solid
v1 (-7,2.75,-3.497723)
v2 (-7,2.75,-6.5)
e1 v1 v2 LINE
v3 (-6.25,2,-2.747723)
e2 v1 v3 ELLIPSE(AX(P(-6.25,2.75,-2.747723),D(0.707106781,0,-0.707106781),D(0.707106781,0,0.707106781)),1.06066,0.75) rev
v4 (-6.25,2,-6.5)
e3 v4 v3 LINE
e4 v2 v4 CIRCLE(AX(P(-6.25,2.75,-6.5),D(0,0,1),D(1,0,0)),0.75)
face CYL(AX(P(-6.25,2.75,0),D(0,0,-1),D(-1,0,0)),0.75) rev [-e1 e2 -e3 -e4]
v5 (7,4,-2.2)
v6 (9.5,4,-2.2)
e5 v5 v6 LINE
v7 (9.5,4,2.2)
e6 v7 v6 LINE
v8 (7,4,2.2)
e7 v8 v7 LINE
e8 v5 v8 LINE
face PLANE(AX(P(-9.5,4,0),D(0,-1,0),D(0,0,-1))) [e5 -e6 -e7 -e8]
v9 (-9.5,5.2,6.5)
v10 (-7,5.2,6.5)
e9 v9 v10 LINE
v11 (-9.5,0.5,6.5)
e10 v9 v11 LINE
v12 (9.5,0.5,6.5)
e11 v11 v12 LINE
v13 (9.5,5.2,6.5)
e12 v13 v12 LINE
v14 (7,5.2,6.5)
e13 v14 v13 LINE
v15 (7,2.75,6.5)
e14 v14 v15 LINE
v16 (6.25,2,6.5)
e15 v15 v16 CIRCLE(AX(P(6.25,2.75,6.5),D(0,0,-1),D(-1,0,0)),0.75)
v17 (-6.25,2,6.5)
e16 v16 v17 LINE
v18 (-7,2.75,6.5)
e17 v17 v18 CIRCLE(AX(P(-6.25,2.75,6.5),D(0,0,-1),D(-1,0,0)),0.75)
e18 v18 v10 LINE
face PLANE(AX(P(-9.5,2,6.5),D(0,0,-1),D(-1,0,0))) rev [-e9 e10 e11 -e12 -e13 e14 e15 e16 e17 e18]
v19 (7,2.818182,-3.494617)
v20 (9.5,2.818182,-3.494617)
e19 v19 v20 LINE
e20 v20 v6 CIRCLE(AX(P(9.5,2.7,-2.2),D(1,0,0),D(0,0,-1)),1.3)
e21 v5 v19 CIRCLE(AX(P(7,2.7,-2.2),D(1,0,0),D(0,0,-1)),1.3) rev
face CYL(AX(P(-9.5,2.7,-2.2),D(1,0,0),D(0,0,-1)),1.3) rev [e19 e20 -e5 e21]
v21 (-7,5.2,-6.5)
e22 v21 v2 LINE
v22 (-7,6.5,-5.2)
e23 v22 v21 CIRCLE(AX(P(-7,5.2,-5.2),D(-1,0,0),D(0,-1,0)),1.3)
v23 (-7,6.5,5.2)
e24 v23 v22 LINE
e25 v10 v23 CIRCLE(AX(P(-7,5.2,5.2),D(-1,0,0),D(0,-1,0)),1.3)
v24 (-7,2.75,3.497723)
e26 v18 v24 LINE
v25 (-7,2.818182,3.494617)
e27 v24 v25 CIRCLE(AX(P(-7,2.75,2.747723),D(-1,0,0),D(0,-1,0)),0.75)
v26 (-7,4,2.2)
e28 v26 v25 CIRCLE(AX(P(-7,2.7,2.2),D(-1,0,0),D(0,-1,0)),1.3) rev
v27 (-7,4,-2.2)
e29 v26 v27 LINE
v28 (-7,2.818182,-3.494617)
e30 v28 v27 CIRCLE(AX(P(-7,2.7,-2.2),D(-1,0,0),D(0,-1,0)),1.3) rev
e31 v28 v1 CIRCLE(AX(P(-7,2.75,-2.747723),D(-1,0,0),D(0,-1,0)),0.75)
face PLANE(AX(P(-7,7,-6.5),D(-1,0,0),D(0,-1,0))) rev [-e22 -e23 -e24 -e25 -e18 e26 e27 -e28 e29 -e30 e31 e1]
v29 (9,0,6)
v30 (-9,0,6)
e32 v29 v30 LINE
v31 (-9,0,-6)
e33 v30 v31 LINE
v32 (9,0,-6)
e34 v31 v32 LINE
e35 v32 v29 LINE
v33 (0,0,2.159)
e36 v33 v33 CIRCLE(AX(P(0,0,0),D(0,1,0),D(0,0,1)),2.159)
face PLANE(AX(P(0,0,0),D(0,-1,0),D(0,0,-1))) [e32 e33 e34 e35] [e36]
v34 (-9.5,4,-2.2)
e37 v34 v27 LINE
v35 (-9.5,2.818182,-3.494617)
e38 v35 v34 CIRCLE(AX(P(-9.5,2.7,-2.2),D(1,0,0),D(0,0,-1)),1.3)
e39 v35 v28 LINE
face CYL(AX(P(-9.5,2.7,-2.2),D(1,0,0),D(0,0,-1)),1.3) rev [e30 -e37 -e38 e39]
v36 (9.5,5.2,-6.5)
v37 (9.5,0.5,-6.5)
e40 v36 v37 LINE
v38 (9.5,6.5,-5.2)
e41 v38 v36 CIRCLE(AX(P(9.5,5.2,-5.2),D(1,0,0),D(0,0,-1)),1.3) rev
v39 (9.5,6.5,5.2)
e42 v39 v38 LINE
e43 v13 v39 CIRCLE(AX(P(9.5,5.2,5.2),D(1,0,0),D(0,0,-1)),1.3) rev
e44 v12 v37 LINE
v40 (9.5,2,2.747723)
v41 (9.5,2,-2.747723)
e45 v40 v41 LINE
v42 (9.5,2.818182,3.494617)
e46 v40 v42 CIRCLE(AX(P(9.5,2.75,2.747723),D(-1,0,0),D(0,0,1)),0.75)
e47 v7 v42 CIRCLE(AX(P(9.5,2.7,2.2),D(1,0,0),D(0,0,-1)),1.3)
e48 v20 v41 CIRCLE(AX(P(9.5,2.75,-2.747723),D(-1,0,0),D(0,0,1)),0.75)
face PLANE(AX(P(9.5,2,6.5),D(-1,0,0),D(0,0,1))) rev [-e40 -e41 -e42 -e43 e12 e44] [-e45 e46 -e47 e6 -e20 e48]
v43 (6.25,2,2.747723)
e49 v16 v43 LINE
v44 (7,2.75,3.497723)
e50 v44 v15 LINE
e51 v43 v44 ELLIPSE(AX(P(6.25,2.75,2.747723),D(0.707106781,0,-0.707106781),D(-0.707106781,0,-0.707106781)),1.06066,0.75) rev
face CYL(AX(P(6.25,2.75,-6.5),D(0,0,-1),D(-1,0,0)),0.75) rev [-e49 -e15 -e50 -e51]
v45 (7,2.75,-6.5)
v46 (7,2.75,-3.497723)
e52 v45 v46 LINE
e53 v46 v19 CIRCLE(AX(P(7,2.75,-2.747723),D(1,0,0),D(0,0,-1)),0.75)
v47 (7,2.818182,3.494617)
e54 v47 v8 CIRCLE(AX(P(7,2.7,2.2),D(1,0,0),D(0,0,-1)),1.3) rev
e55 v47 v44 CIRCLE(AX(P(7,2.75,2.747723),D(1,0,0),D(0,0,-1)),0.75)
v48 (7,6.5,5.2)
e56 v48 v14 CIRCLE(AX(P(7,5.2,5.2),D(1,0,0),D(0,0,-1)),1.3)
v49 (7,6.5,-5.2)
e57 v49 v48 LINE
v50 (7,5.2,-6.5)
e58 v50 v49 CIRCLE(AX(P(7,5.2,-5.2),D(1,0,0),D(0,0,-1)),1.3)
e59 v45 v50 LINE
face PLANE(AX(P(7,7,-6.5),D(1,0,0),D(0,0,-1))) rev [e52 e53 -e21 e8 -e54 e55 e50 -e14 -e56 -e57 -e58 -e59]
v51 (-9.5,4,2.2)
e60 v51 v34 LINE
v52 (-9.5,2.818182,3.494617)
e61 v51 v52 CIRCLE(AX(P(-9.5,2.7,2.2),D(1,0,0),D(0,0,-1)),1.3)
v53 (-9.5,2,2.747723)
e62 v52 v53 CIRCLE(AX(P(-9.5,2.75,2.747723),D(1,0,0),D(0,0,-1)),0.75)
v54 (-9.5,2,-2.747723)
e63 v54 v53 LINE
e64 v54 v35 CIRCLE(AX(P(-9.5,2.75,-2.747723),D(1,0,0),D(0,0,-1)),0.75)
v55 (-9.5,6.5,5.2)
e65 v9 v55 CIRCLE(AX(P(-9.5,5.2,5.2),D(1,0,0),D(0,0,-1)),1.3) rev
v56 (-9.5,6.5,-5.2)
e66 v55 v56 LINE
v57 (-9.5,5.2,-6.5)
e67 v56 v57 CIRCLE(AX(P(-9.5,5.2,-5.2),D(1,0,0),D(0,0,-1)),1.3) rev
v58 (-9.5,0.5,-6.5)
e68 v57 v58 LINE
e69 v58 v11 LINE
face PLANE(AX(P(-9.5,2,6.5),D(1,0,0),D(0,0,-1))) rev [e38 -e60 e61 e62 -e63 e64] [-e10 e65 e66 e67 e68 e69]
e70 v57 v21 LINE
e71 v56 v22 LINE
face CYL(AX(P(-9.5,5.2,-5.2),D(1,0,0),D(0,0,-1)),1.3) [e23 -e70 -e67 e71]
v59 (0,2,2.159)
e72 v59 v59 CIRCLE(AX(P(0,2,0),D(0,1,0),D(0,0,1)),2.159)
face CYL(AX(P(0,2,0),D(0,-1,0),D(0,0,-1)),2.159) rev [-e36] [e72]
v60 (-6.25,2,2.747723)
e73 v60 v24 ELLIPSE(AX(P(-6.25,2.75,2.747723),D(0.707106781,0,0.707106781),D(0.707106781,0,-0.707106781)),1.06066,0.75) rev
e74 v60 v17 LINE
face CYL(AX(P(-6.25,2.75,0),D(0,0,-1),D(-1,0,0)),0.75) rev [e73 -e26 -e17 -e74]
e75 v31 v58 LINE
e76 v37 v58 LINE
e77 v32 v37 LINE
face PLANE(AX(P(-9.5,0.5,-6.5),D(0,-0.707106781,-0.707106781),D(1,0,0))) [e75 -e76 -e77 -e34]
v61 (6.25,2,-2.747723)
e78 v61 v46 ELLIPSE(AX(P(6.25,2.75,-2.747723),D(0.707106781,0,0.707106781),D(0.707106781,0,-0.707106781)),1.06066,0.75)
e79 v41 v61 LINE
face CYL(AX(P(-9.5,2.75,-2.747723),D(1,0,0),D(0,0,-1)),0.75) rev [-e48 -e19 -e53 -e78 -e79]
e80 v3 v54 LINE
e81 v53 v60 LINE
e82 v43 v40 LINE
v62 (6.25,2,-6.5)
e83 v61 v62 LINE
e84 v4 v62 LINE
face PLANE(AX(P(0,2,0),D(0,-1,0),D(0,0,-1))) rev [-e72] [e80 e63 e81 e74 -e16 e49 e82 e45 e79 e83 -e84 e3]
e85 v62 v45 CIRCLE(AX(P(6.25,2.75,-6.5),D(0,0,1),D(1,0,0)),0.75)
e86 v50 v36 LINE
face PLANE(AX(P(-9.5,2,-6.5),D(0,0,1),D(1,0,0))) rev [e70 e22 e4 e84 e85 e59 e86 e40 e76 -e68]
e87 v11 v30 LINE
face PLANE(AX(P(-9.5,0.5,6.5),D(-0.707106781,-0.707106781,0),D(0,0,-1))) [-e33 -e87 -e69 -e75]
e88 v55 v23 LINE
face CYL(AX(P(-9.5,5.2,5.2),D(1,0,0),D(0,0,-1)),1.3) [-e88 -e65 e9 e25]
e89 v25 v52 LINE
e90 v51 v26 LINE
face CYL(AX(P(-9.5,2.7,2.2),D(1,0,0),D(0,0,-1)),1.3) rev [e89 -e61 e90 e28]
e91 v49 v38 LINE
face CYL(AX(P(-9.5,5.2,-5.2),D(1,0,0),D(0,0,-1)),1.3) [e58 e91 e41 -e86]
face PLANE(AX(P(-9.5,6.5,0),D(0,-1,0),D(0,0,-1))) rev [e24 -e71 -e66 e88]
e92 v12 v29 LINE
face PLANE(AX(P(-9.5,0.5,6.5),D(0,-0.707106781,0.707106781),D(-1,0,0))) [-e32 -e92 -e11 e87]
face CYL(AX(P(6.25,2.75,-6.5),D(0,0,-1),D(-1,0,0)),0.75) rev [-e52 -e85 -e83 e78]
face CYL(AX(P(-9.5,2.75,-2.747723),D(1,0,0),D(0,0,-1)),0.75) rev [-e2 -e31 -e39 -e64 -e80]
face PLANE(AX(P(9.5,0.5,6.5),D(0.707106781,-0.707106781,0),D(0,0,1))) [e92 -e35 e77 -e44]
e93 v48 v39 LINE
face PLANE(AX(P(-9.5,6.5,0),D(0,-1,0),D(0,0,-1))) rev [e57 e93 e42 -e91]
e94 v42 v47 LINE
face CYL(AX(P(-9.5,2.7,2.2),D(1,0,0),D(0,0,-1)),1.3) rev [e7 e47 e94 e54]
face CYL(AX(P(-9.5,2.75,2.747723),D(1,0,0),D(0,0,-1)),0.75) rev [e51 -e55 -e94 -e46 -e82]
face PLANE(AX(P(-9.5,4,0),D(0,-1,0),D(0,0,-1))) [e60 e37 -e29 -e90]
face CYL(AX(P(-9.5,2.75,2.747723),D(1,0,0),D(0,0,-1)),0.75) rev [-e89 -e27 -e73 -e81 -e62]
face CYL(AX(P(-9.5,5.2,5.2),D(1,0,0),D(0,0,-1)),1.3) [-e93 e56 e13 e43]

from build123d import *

# Parameters (mm, degrees)
SKETCH1_W               = 19
SKETCH1_H               = 13
SKETCH1_R               = 2.159
BOSS_EXTRUDE1_DEPTH     = 2
BOSS_EXTRUDE2_DEPTH     = 19
CUT_EXTRUDE1_DEPTH      = 18.363755354
CUT_EXTRUDE1_DEPTH_BACK = 18.363755354
SKETCH4_W               = 14
SKETCH4_H               = 5
FILLET1_R               = 0.75
CHAMFER1_SIZE           = 0.5


with BuildPart() as part:
    # Sketch1 → Boss-Extrude1 (new body)
    with BuildSketch(Plane(origin=(0, 0, 0), x_dir=(1, 0, 0), z_dir=(0, 1, 0))):
        Rectangle(SKETCH1_W, SKETCH1_H)
        with Locations(Location((0, 0, 0), (0, 0, 270))):
            Circle(SKETCH1_R, mode=Mode.SUBTRACT)
    extrude(amount=BOSS_EXTRUDE1_DEPTH)

    # Sketch2 → Boss-Extrude2 (add)
    with BuildSketch(Plane(origin=(9.5, 0, 0), x_dir=(0, 0, -1), z_dir=(1, 0, 0))):
        with BuildLine():
            Line((-6.5, 5.2), (-6.5, 2))
            Line((-6.5, 2), (-3.5, 2))
            Line((-3.5, 2), (-3.5, 2.7))
            ThreePointArc((-3.5, 2.7), (-3.119238816, 3.619238816), (-2.2, 4))
            Line((-2.2, 4), (2.2, 4))
            ThreePointArc((2.2, 4), (3.119238816, 3.619238816), (3.5, 2.7))
            Line((3.5, 2.7), (3.5, 2))
            Line((3.5, 2), (6.5, 2))
            Line((6.5, 2), (6.5, 5.2))
            ThreePointArc((6.5, 5.2), (6.119238816, 6.119238816), (5.2, 6.5))
            Line((5.2, 6.5), (-5.2, 6.5))
            ThreePointArc((-5.2, 6.5), (-6.119238816, 6.119238816), (-6.5, 5.2))
        make_face()
    extrude(amount=-BOSS_EXTRUDE2_DEPTH)

    # Sketch4 → Cut-Extrude1 (cut, two sides: drawn at the far end of the back side and taken through both)
    with BuildSketch(Plane.XY.offset(6.5).offset(-CUT_EXTRUDE1_DEPTH_BACK)):
        with Locations((0, 4.5)):
            Rectangle(SKETCH4_W, SKETCH4_H)
    extrude(amount=CUT_EXTRUDE1_DEPTH + CUT_EXTRUDE1_DEPTH_BACK, mode=Mode.SUBTRACT)

    # Fillet1
    # the kernel refuses this fillet: 0.75 mm, written as the material it adds along each edge
    with BuildSketch(Plane(origin=(-7, 2, 3.5), x_dir=(1, 0, 0), z_dir=(0, 0, 1)), Plane(origin=(-7, 2, -6.5), x_dir=(1, 0, 0), z_dir=(0, 0, 1))) as fillet1_piece_1:
        with BuildLine():
            CenterArc((FILLET1_R, FILLET1_R), FILLET1_R, 180, 90)
            Line((0, FILLET1_R), (-FILLET1_R * 0.02, FILLET1_R))
            Line((-FILLET1_R * 0.02, FILLET1_R), (-FILLET1_R * 0.02, -FILLET1_R * 0.02))
            Line((-FILLET1_R * 0.02, -FILLET1_R * 0.02), (FILLET1_R, -FILLET1_R * 0.02))
            Line((FILLET1_R, -FILLET1_R * 0.02), (FILLET1_R, 0))
        make_face()
    extrude(amount=3)
    with BuildSketch(Plane(origin=(-7, 2, 3.5), x_dir=(0, 0, -1), z_dir=(-1, 0, 0)), Plane(origin=(9.5, 2, 3.5), x_dir=(0, 0, -1), z_dir=(-1, 0, 0))) as fillet1_piece_2:
        with BuildLine():
            CenterArc((0.752277442, -0.75), FILLET1_R, 90, 95.21590857)
            Line((0.005383046, -0.818181818), (-0.069306394, -0.825))
            ThreePointArc((-0.069306394, -0.825), (-0.075, -0.7), (-0.075, 0))
            Line((-0.075, 0), (0, 0.075))
            Line((0, 0.075), (0.752277442, 0.075))
            Line((0.752277442, 0.075), (0.752277442, 0))
        make_face()
    extrude(amount=2.5)
    with BuildSketch(Plane(origin=(7, 2, 6.5), x_dir=(0, 1, 0), z_dir=(0, 0, -1)), Plane(origin=(7, 2, -3.5), x_dir=(0, 1, 0), z_dir=(0, 0, -1))) as fillet1_piece_3:
        with BuildLine():
            CenterArc((FILLET1_R, -FILLET1_R), FILLET1_R, 90, 90)
            Line((0, -FILLET1_R), (-FILLET1_R * 0.02, -FILLET1_R))
            Line((-FILLET1_R * 0.02, -FILLET1_R), (-FILLET1_R * 0.02, FILLET1_R * 0.02))
            Line((-FILLET1_R * 0.02, FILLET1_R * 0.02), (FILLET1_R, FILLET1_R * 0.02))
            Line((FILLET1_R, FILLET1_R * 0.02), (FILLET1_R, 0))
        make_face()
    extrude(amount=3)
    with BuildSketch(Plane(origin=(9.5, 2, -3.5), x_dir=(0, 0, 1), z_dir=(-1, 0, 0)), Plane(origin=(-7, 2, -3.5), x_dir=(0, 0, 1), z_dir=(-1, 0, 0))) as fillet1_piece_4:
        with BuildLine():
            CenterArc((0.752277442, 0.75), FILLET1_R, 174.78409143, 95.21590857)
            Line((0.005383046, 0.818181818), (-0.069306394, 0.825))
            ThreePointArc((-0.069306394, 0.825), (-0.075, 0.7), (-0.075, 0))
            Line((-0.075, 0), (0, -0.075))
            Line((0, -0.075), (0.752277442, -0.075))
            Line((0.752277442, -0.075), (0.752277442, 0))
        make_face()
    extrude(amount=2.5)
    with BuildSketch(Plane(origin=(-7, 2, 1.625), x_dir=(1, 0, 0), z_dir=(0, 0, 1))) as fillet1_piece_5a_section:
        with BuildLine():
            CenterArc((FILLET1_R, FILLET1_R), FILLET1_R, 180, 90)
            Line((0, FILLET1_R), (-FILLET1_R * 0.02, FILLET1_R))
            Line((-FILLET1_R * 0.02, FILLET1_R), (-FILLET1_R * 0.02, -FILLET1_R * 0.02))
            Line((-FILLET1_R * 0.02, -FILLET1_R * 0.02), (FILLET1_R, -FILLET1_R * 0.02))
            Line((FILLET1_R, -FILLET1_R * 0.02), (FILLET1_R, 0))
        make_face()
    fillet1_piece_5a = extrude(amount=4.875, mode=Mode.PRIVATE)
    fillet1_piece_5a = split(fillet1_piece_5a, bisect_by=Plane(origin=(-6.830203664, 2.169796336, 3.5), z_dir=(0, 0, -1)), keep=Keep.TOP, mode=Mode.PRIVATE)
    with BuildSketch(Plane(origin=(-4.954501184, 2, 3.5), x_dir=(0, 0, -1), z_dir=(-1, 0, 0))) as fillet1_piece_5b_section:
        with BuildLine():
            CenterArc((0.752277442, -0.75), FILLET1_R, 90, 95.21590857)
            Line((0.005383046, -0.818181818), (-0.069306394, -0.825))
            ThreePointArc((-0.069306394, -0.825), (-0.075, -0.7), (-0.075, 0))
            Line((-0.075, 0), (0, 0.075))
            Line((0, 0.075), (0.752277442, 0.075))
            Line((0.752277442, 0.075), (0.752277442, 0))
        make_face()
    fillet1_piece_5b = extrude(amount=4.545498816, mode=Mode.PRIVATE)
    fillet1_piece_5b = split(fillet1_piece_5b, bisect_by=Plane(origin=(-7, 2.182819777, 3.341220423), z_dir=(1, 0, 0)), keep=Keep.TOP, mode=Mode.PRIVATE)
    fillet1_piece_5 = fillet1_piece_5a & fillet1_piece_5b
    add(fillet1_piece_5)
    with BuildSketch(Plane(origin=(7, 2, 6.5), x_dir=(0, 1, 0), z_dir=(0, 0, -1))) as fillet1_piece_6a_section:
        with BuildLine():
            CenterArc((FILLET1_R, -FILLET1_R), FILLET1_R, 90, 90)
            Line((0, -FILLET1_R), (-FILLET1_R * 0.02, -FILLET1_R))
            Line((-FILLET1_R * 0.02, -FILLET1_R), (-FILLET1_R * 0.02, FILLET1_R * 0.02))
            Line((-FILLET1_R * 0.02, FILLET1_R * 0.02), (FILLET1_R, FILLET1_R * 0.02))
            Line((FILLET1_R, FILLET1_R * 0.02), (FILLET1_R, 0))
        make_face()
    fillet1_piece_6a = extrude(amount=4.875, mode=Mode.PRIVATE)
    fillet1_piece_6a = split(fillet1_piece_6a, bisect_by=Plane(origin=(6.830203664, 2.169796336, 3.5), z_dir=(0, 0, -1)), keep=Keep.TOP, mode=Mode.PRIVATE)
    with BuildSketch(Plane(origin=(9.5, 2, 3.5), x_dir=(0, 0, -1), z_dir=(-1, 0, 0))) as fillet1_piece_6b_section:
        with BuildLine():
            CenterArc((0.752277442, -0.75), FILLET1_R, 90, 95.21590857)
            Line((0.005383046, -0.818181818), (-0.069306394, -0.825))
            ThreePointArc((-0.069306394, -0.825), (-0.075, -0.7), (-0.075, 0))
            Line((-0.075, 0), (0, 0.075))
            Line((0, 0.075), (0.752277442, 0.075))
            Line((0.752277442, 0.075), (0.752277442, 0))
        make_face()
    fillet1_piece_6b = extrude(amount=4.545498816, mode=Mode.PRIVATE)
    fillet1_piece_6b = split(fillet1_piece_6b, bisect_by=Plane(origin=(7, 2.182819777, 3.341220423), z_dir=(-1, 0, 0)), keep=Keep.TOP, mode=Mode.PRIVATE)
    fillet1_piece_6 = fillet1_piece_6a & fillet1_piece_6b
    add(fillet1_piece_6)
    with BuildSketch(Plane(origin=(7, 2, -1.625), x_dir=(0, 1, 0), z_dir=(0, 0, -1))) as fillet1_piece_7a_section:
        with BuildLine():
            CenterArc((FILLET1_R, -FILLET1_R), FILLET1_R, 90, 90)
            Line((0, -FILLET1_R), (-FILLET1_R * 0.02, -FILLET1_R))
            Line((-FILLET1_R * 0.02, -FILLET1_R), (-FILLET1_R * 0.02, FILLET1_R * 0.02))
            Line((-FILLET1_R * 0.02, FILLET1_R * 0.02), (FILLET1_R, FILLET1_R * 0.02))
            Line((FILLET1_R, FILLET1_R * 0.02), (FILLET1_R, 0))
        make_face()
    fillet1_piece_7a = extrude(amount=4.875, mode=Mode.PRIVATE)
    fillet1_piece_7a = split(fillet1_piece_7a, bisect_by=Plane(origin=(6.830203664, 2.169796336, -3.5), z_dir=(0, 0, 1)), keep=Keep.TOP, mode=Mode.PRIVATE)
    with BuildSketch(Plane(origin=(9.5, 2, -3.5), x_dir=(0, 0, 1), z_dir=(-1, 0, 0))) as fillet1_piece_7b_section:
        with BuildLine():
            CenterArc((0.752277442, 0.75), FILLET1_R, 174.78409143, 95.21590857)
            Line((0.005383046, 0.818181818), (-0.069306394, 0.825))
            ThreePointArc((-0.069306394, 0.825), (-0.075, 0.7), (-0.075, 0))
            Line((-0.075, 0), (0, -0.075))
            Line((0, -0.075), (0.752277442, -0.075))
            Line((0.752277442, -0.075), (0.752277442, 0))
        make_face()
    fillet1_piece_7b = extrude(amount=4.545498816, mode=Mode.PRIVATE)
    fillet1_piece_7b = split(fillet1_piece_7b, bisect_by=Plane(origin=(7, 2.182819777, -3.341220423), z_dir=(-1, 0, 0)), keep=Keep.TOP, mode=Mode.PRIVATE)
    fillet1_piece_7 = fillet1_piece_7a & fillet1_piece_7b
    add(fillet1_piece_7)
    with BuildSketch(Plane(origin=(-4.954501184, 2, -3.5), x_dir=(0, 0, 1), z_dir=(-1, 0, 0))) as fillet1_piece_8a_section:
        with BuildLine():
            CenterArc((0.752277442, 0.75), FILLET1_R, 174.78409143, 95.21590857)
            Line((0.005383046, 0.818181818), (-0.069306394, 0.825))
            ThreePointArc((-0.069306394, 0.825), (-0.075, 0.7), (-0.075, 0))
            Line((-0.075, 0), (0, -0.075))
            Line((0, -0.075), (0.752277442, -0.075))
            Line((0.752277442, -0.075), (0.752277442, 0))
        make_face()
    fillet1_piece_8a = extrude(amount=4.545498816, mode=Mode.PRIVATE)
    fillet1_piece_8a = split(fillet1_piece_8a, bisect_by=Plane(origin=(-7, 2.182819777, -3.341220423), z_dir=(1, 0, 0)), keep=Keep.TOP, mode=Mode.PRIVATE)
    with BuildSketch(Plane(origin=(-7, 2, -6.5), x_dir=(1, 0, 0), z_dir=(0, 0, 1))) as fillet1_piece_8b_section:
        with BuildLine():
            CenterArc((FILLET1_R, FILLET1_R), FILLET1_R, 180, 90)
            Line((0, FILLET1_R), (-FILLET1_R * 0.02, FILLET1_R))
            Line((-FILLET1_R * 0.02, FILLET1_R), (-FILLET1_R * 0.02, -FILLET1_R * 0.02))
            Line((-FILLET1_R * 0.02, -FILLET1_R * 0.02), (FILLET1_R, -FILLET1_R * 0.02))
            Line((FILLET1_R, -FILLET1_R * 0.02), (FILLET1_R, 0))
        make_face()
    fillet1_piece_8b = extrude(amount=4.875, mode=Mode.PRIVATE)
    fillet1_piece_8b = split(fillet1_piece_8b, bisect_by=Plane(origin=(-6.830203664, 2.169796336, -3.5), z_dir=(0, 0, 1)), keep=Keep.TOP, mode=Mode.PRIVATE)
    fillet1_piece_8 = fillet1_piece_8a & fillet1_piece_8b
    add(fillet1_piece_8)

    # Chamfer1
    chamfer1_edges = [part.edges().sort_by_distance(p)[0] for p in [
        (0, 0, 6.5),
        (-9.5, 0, 0),
        (0, 0, -6.5),
        (9.5, 0, 0),
    ]]
    chamfer(chamfer1_edges, length=CHAMFER1_SIZE)


solid = part.part
